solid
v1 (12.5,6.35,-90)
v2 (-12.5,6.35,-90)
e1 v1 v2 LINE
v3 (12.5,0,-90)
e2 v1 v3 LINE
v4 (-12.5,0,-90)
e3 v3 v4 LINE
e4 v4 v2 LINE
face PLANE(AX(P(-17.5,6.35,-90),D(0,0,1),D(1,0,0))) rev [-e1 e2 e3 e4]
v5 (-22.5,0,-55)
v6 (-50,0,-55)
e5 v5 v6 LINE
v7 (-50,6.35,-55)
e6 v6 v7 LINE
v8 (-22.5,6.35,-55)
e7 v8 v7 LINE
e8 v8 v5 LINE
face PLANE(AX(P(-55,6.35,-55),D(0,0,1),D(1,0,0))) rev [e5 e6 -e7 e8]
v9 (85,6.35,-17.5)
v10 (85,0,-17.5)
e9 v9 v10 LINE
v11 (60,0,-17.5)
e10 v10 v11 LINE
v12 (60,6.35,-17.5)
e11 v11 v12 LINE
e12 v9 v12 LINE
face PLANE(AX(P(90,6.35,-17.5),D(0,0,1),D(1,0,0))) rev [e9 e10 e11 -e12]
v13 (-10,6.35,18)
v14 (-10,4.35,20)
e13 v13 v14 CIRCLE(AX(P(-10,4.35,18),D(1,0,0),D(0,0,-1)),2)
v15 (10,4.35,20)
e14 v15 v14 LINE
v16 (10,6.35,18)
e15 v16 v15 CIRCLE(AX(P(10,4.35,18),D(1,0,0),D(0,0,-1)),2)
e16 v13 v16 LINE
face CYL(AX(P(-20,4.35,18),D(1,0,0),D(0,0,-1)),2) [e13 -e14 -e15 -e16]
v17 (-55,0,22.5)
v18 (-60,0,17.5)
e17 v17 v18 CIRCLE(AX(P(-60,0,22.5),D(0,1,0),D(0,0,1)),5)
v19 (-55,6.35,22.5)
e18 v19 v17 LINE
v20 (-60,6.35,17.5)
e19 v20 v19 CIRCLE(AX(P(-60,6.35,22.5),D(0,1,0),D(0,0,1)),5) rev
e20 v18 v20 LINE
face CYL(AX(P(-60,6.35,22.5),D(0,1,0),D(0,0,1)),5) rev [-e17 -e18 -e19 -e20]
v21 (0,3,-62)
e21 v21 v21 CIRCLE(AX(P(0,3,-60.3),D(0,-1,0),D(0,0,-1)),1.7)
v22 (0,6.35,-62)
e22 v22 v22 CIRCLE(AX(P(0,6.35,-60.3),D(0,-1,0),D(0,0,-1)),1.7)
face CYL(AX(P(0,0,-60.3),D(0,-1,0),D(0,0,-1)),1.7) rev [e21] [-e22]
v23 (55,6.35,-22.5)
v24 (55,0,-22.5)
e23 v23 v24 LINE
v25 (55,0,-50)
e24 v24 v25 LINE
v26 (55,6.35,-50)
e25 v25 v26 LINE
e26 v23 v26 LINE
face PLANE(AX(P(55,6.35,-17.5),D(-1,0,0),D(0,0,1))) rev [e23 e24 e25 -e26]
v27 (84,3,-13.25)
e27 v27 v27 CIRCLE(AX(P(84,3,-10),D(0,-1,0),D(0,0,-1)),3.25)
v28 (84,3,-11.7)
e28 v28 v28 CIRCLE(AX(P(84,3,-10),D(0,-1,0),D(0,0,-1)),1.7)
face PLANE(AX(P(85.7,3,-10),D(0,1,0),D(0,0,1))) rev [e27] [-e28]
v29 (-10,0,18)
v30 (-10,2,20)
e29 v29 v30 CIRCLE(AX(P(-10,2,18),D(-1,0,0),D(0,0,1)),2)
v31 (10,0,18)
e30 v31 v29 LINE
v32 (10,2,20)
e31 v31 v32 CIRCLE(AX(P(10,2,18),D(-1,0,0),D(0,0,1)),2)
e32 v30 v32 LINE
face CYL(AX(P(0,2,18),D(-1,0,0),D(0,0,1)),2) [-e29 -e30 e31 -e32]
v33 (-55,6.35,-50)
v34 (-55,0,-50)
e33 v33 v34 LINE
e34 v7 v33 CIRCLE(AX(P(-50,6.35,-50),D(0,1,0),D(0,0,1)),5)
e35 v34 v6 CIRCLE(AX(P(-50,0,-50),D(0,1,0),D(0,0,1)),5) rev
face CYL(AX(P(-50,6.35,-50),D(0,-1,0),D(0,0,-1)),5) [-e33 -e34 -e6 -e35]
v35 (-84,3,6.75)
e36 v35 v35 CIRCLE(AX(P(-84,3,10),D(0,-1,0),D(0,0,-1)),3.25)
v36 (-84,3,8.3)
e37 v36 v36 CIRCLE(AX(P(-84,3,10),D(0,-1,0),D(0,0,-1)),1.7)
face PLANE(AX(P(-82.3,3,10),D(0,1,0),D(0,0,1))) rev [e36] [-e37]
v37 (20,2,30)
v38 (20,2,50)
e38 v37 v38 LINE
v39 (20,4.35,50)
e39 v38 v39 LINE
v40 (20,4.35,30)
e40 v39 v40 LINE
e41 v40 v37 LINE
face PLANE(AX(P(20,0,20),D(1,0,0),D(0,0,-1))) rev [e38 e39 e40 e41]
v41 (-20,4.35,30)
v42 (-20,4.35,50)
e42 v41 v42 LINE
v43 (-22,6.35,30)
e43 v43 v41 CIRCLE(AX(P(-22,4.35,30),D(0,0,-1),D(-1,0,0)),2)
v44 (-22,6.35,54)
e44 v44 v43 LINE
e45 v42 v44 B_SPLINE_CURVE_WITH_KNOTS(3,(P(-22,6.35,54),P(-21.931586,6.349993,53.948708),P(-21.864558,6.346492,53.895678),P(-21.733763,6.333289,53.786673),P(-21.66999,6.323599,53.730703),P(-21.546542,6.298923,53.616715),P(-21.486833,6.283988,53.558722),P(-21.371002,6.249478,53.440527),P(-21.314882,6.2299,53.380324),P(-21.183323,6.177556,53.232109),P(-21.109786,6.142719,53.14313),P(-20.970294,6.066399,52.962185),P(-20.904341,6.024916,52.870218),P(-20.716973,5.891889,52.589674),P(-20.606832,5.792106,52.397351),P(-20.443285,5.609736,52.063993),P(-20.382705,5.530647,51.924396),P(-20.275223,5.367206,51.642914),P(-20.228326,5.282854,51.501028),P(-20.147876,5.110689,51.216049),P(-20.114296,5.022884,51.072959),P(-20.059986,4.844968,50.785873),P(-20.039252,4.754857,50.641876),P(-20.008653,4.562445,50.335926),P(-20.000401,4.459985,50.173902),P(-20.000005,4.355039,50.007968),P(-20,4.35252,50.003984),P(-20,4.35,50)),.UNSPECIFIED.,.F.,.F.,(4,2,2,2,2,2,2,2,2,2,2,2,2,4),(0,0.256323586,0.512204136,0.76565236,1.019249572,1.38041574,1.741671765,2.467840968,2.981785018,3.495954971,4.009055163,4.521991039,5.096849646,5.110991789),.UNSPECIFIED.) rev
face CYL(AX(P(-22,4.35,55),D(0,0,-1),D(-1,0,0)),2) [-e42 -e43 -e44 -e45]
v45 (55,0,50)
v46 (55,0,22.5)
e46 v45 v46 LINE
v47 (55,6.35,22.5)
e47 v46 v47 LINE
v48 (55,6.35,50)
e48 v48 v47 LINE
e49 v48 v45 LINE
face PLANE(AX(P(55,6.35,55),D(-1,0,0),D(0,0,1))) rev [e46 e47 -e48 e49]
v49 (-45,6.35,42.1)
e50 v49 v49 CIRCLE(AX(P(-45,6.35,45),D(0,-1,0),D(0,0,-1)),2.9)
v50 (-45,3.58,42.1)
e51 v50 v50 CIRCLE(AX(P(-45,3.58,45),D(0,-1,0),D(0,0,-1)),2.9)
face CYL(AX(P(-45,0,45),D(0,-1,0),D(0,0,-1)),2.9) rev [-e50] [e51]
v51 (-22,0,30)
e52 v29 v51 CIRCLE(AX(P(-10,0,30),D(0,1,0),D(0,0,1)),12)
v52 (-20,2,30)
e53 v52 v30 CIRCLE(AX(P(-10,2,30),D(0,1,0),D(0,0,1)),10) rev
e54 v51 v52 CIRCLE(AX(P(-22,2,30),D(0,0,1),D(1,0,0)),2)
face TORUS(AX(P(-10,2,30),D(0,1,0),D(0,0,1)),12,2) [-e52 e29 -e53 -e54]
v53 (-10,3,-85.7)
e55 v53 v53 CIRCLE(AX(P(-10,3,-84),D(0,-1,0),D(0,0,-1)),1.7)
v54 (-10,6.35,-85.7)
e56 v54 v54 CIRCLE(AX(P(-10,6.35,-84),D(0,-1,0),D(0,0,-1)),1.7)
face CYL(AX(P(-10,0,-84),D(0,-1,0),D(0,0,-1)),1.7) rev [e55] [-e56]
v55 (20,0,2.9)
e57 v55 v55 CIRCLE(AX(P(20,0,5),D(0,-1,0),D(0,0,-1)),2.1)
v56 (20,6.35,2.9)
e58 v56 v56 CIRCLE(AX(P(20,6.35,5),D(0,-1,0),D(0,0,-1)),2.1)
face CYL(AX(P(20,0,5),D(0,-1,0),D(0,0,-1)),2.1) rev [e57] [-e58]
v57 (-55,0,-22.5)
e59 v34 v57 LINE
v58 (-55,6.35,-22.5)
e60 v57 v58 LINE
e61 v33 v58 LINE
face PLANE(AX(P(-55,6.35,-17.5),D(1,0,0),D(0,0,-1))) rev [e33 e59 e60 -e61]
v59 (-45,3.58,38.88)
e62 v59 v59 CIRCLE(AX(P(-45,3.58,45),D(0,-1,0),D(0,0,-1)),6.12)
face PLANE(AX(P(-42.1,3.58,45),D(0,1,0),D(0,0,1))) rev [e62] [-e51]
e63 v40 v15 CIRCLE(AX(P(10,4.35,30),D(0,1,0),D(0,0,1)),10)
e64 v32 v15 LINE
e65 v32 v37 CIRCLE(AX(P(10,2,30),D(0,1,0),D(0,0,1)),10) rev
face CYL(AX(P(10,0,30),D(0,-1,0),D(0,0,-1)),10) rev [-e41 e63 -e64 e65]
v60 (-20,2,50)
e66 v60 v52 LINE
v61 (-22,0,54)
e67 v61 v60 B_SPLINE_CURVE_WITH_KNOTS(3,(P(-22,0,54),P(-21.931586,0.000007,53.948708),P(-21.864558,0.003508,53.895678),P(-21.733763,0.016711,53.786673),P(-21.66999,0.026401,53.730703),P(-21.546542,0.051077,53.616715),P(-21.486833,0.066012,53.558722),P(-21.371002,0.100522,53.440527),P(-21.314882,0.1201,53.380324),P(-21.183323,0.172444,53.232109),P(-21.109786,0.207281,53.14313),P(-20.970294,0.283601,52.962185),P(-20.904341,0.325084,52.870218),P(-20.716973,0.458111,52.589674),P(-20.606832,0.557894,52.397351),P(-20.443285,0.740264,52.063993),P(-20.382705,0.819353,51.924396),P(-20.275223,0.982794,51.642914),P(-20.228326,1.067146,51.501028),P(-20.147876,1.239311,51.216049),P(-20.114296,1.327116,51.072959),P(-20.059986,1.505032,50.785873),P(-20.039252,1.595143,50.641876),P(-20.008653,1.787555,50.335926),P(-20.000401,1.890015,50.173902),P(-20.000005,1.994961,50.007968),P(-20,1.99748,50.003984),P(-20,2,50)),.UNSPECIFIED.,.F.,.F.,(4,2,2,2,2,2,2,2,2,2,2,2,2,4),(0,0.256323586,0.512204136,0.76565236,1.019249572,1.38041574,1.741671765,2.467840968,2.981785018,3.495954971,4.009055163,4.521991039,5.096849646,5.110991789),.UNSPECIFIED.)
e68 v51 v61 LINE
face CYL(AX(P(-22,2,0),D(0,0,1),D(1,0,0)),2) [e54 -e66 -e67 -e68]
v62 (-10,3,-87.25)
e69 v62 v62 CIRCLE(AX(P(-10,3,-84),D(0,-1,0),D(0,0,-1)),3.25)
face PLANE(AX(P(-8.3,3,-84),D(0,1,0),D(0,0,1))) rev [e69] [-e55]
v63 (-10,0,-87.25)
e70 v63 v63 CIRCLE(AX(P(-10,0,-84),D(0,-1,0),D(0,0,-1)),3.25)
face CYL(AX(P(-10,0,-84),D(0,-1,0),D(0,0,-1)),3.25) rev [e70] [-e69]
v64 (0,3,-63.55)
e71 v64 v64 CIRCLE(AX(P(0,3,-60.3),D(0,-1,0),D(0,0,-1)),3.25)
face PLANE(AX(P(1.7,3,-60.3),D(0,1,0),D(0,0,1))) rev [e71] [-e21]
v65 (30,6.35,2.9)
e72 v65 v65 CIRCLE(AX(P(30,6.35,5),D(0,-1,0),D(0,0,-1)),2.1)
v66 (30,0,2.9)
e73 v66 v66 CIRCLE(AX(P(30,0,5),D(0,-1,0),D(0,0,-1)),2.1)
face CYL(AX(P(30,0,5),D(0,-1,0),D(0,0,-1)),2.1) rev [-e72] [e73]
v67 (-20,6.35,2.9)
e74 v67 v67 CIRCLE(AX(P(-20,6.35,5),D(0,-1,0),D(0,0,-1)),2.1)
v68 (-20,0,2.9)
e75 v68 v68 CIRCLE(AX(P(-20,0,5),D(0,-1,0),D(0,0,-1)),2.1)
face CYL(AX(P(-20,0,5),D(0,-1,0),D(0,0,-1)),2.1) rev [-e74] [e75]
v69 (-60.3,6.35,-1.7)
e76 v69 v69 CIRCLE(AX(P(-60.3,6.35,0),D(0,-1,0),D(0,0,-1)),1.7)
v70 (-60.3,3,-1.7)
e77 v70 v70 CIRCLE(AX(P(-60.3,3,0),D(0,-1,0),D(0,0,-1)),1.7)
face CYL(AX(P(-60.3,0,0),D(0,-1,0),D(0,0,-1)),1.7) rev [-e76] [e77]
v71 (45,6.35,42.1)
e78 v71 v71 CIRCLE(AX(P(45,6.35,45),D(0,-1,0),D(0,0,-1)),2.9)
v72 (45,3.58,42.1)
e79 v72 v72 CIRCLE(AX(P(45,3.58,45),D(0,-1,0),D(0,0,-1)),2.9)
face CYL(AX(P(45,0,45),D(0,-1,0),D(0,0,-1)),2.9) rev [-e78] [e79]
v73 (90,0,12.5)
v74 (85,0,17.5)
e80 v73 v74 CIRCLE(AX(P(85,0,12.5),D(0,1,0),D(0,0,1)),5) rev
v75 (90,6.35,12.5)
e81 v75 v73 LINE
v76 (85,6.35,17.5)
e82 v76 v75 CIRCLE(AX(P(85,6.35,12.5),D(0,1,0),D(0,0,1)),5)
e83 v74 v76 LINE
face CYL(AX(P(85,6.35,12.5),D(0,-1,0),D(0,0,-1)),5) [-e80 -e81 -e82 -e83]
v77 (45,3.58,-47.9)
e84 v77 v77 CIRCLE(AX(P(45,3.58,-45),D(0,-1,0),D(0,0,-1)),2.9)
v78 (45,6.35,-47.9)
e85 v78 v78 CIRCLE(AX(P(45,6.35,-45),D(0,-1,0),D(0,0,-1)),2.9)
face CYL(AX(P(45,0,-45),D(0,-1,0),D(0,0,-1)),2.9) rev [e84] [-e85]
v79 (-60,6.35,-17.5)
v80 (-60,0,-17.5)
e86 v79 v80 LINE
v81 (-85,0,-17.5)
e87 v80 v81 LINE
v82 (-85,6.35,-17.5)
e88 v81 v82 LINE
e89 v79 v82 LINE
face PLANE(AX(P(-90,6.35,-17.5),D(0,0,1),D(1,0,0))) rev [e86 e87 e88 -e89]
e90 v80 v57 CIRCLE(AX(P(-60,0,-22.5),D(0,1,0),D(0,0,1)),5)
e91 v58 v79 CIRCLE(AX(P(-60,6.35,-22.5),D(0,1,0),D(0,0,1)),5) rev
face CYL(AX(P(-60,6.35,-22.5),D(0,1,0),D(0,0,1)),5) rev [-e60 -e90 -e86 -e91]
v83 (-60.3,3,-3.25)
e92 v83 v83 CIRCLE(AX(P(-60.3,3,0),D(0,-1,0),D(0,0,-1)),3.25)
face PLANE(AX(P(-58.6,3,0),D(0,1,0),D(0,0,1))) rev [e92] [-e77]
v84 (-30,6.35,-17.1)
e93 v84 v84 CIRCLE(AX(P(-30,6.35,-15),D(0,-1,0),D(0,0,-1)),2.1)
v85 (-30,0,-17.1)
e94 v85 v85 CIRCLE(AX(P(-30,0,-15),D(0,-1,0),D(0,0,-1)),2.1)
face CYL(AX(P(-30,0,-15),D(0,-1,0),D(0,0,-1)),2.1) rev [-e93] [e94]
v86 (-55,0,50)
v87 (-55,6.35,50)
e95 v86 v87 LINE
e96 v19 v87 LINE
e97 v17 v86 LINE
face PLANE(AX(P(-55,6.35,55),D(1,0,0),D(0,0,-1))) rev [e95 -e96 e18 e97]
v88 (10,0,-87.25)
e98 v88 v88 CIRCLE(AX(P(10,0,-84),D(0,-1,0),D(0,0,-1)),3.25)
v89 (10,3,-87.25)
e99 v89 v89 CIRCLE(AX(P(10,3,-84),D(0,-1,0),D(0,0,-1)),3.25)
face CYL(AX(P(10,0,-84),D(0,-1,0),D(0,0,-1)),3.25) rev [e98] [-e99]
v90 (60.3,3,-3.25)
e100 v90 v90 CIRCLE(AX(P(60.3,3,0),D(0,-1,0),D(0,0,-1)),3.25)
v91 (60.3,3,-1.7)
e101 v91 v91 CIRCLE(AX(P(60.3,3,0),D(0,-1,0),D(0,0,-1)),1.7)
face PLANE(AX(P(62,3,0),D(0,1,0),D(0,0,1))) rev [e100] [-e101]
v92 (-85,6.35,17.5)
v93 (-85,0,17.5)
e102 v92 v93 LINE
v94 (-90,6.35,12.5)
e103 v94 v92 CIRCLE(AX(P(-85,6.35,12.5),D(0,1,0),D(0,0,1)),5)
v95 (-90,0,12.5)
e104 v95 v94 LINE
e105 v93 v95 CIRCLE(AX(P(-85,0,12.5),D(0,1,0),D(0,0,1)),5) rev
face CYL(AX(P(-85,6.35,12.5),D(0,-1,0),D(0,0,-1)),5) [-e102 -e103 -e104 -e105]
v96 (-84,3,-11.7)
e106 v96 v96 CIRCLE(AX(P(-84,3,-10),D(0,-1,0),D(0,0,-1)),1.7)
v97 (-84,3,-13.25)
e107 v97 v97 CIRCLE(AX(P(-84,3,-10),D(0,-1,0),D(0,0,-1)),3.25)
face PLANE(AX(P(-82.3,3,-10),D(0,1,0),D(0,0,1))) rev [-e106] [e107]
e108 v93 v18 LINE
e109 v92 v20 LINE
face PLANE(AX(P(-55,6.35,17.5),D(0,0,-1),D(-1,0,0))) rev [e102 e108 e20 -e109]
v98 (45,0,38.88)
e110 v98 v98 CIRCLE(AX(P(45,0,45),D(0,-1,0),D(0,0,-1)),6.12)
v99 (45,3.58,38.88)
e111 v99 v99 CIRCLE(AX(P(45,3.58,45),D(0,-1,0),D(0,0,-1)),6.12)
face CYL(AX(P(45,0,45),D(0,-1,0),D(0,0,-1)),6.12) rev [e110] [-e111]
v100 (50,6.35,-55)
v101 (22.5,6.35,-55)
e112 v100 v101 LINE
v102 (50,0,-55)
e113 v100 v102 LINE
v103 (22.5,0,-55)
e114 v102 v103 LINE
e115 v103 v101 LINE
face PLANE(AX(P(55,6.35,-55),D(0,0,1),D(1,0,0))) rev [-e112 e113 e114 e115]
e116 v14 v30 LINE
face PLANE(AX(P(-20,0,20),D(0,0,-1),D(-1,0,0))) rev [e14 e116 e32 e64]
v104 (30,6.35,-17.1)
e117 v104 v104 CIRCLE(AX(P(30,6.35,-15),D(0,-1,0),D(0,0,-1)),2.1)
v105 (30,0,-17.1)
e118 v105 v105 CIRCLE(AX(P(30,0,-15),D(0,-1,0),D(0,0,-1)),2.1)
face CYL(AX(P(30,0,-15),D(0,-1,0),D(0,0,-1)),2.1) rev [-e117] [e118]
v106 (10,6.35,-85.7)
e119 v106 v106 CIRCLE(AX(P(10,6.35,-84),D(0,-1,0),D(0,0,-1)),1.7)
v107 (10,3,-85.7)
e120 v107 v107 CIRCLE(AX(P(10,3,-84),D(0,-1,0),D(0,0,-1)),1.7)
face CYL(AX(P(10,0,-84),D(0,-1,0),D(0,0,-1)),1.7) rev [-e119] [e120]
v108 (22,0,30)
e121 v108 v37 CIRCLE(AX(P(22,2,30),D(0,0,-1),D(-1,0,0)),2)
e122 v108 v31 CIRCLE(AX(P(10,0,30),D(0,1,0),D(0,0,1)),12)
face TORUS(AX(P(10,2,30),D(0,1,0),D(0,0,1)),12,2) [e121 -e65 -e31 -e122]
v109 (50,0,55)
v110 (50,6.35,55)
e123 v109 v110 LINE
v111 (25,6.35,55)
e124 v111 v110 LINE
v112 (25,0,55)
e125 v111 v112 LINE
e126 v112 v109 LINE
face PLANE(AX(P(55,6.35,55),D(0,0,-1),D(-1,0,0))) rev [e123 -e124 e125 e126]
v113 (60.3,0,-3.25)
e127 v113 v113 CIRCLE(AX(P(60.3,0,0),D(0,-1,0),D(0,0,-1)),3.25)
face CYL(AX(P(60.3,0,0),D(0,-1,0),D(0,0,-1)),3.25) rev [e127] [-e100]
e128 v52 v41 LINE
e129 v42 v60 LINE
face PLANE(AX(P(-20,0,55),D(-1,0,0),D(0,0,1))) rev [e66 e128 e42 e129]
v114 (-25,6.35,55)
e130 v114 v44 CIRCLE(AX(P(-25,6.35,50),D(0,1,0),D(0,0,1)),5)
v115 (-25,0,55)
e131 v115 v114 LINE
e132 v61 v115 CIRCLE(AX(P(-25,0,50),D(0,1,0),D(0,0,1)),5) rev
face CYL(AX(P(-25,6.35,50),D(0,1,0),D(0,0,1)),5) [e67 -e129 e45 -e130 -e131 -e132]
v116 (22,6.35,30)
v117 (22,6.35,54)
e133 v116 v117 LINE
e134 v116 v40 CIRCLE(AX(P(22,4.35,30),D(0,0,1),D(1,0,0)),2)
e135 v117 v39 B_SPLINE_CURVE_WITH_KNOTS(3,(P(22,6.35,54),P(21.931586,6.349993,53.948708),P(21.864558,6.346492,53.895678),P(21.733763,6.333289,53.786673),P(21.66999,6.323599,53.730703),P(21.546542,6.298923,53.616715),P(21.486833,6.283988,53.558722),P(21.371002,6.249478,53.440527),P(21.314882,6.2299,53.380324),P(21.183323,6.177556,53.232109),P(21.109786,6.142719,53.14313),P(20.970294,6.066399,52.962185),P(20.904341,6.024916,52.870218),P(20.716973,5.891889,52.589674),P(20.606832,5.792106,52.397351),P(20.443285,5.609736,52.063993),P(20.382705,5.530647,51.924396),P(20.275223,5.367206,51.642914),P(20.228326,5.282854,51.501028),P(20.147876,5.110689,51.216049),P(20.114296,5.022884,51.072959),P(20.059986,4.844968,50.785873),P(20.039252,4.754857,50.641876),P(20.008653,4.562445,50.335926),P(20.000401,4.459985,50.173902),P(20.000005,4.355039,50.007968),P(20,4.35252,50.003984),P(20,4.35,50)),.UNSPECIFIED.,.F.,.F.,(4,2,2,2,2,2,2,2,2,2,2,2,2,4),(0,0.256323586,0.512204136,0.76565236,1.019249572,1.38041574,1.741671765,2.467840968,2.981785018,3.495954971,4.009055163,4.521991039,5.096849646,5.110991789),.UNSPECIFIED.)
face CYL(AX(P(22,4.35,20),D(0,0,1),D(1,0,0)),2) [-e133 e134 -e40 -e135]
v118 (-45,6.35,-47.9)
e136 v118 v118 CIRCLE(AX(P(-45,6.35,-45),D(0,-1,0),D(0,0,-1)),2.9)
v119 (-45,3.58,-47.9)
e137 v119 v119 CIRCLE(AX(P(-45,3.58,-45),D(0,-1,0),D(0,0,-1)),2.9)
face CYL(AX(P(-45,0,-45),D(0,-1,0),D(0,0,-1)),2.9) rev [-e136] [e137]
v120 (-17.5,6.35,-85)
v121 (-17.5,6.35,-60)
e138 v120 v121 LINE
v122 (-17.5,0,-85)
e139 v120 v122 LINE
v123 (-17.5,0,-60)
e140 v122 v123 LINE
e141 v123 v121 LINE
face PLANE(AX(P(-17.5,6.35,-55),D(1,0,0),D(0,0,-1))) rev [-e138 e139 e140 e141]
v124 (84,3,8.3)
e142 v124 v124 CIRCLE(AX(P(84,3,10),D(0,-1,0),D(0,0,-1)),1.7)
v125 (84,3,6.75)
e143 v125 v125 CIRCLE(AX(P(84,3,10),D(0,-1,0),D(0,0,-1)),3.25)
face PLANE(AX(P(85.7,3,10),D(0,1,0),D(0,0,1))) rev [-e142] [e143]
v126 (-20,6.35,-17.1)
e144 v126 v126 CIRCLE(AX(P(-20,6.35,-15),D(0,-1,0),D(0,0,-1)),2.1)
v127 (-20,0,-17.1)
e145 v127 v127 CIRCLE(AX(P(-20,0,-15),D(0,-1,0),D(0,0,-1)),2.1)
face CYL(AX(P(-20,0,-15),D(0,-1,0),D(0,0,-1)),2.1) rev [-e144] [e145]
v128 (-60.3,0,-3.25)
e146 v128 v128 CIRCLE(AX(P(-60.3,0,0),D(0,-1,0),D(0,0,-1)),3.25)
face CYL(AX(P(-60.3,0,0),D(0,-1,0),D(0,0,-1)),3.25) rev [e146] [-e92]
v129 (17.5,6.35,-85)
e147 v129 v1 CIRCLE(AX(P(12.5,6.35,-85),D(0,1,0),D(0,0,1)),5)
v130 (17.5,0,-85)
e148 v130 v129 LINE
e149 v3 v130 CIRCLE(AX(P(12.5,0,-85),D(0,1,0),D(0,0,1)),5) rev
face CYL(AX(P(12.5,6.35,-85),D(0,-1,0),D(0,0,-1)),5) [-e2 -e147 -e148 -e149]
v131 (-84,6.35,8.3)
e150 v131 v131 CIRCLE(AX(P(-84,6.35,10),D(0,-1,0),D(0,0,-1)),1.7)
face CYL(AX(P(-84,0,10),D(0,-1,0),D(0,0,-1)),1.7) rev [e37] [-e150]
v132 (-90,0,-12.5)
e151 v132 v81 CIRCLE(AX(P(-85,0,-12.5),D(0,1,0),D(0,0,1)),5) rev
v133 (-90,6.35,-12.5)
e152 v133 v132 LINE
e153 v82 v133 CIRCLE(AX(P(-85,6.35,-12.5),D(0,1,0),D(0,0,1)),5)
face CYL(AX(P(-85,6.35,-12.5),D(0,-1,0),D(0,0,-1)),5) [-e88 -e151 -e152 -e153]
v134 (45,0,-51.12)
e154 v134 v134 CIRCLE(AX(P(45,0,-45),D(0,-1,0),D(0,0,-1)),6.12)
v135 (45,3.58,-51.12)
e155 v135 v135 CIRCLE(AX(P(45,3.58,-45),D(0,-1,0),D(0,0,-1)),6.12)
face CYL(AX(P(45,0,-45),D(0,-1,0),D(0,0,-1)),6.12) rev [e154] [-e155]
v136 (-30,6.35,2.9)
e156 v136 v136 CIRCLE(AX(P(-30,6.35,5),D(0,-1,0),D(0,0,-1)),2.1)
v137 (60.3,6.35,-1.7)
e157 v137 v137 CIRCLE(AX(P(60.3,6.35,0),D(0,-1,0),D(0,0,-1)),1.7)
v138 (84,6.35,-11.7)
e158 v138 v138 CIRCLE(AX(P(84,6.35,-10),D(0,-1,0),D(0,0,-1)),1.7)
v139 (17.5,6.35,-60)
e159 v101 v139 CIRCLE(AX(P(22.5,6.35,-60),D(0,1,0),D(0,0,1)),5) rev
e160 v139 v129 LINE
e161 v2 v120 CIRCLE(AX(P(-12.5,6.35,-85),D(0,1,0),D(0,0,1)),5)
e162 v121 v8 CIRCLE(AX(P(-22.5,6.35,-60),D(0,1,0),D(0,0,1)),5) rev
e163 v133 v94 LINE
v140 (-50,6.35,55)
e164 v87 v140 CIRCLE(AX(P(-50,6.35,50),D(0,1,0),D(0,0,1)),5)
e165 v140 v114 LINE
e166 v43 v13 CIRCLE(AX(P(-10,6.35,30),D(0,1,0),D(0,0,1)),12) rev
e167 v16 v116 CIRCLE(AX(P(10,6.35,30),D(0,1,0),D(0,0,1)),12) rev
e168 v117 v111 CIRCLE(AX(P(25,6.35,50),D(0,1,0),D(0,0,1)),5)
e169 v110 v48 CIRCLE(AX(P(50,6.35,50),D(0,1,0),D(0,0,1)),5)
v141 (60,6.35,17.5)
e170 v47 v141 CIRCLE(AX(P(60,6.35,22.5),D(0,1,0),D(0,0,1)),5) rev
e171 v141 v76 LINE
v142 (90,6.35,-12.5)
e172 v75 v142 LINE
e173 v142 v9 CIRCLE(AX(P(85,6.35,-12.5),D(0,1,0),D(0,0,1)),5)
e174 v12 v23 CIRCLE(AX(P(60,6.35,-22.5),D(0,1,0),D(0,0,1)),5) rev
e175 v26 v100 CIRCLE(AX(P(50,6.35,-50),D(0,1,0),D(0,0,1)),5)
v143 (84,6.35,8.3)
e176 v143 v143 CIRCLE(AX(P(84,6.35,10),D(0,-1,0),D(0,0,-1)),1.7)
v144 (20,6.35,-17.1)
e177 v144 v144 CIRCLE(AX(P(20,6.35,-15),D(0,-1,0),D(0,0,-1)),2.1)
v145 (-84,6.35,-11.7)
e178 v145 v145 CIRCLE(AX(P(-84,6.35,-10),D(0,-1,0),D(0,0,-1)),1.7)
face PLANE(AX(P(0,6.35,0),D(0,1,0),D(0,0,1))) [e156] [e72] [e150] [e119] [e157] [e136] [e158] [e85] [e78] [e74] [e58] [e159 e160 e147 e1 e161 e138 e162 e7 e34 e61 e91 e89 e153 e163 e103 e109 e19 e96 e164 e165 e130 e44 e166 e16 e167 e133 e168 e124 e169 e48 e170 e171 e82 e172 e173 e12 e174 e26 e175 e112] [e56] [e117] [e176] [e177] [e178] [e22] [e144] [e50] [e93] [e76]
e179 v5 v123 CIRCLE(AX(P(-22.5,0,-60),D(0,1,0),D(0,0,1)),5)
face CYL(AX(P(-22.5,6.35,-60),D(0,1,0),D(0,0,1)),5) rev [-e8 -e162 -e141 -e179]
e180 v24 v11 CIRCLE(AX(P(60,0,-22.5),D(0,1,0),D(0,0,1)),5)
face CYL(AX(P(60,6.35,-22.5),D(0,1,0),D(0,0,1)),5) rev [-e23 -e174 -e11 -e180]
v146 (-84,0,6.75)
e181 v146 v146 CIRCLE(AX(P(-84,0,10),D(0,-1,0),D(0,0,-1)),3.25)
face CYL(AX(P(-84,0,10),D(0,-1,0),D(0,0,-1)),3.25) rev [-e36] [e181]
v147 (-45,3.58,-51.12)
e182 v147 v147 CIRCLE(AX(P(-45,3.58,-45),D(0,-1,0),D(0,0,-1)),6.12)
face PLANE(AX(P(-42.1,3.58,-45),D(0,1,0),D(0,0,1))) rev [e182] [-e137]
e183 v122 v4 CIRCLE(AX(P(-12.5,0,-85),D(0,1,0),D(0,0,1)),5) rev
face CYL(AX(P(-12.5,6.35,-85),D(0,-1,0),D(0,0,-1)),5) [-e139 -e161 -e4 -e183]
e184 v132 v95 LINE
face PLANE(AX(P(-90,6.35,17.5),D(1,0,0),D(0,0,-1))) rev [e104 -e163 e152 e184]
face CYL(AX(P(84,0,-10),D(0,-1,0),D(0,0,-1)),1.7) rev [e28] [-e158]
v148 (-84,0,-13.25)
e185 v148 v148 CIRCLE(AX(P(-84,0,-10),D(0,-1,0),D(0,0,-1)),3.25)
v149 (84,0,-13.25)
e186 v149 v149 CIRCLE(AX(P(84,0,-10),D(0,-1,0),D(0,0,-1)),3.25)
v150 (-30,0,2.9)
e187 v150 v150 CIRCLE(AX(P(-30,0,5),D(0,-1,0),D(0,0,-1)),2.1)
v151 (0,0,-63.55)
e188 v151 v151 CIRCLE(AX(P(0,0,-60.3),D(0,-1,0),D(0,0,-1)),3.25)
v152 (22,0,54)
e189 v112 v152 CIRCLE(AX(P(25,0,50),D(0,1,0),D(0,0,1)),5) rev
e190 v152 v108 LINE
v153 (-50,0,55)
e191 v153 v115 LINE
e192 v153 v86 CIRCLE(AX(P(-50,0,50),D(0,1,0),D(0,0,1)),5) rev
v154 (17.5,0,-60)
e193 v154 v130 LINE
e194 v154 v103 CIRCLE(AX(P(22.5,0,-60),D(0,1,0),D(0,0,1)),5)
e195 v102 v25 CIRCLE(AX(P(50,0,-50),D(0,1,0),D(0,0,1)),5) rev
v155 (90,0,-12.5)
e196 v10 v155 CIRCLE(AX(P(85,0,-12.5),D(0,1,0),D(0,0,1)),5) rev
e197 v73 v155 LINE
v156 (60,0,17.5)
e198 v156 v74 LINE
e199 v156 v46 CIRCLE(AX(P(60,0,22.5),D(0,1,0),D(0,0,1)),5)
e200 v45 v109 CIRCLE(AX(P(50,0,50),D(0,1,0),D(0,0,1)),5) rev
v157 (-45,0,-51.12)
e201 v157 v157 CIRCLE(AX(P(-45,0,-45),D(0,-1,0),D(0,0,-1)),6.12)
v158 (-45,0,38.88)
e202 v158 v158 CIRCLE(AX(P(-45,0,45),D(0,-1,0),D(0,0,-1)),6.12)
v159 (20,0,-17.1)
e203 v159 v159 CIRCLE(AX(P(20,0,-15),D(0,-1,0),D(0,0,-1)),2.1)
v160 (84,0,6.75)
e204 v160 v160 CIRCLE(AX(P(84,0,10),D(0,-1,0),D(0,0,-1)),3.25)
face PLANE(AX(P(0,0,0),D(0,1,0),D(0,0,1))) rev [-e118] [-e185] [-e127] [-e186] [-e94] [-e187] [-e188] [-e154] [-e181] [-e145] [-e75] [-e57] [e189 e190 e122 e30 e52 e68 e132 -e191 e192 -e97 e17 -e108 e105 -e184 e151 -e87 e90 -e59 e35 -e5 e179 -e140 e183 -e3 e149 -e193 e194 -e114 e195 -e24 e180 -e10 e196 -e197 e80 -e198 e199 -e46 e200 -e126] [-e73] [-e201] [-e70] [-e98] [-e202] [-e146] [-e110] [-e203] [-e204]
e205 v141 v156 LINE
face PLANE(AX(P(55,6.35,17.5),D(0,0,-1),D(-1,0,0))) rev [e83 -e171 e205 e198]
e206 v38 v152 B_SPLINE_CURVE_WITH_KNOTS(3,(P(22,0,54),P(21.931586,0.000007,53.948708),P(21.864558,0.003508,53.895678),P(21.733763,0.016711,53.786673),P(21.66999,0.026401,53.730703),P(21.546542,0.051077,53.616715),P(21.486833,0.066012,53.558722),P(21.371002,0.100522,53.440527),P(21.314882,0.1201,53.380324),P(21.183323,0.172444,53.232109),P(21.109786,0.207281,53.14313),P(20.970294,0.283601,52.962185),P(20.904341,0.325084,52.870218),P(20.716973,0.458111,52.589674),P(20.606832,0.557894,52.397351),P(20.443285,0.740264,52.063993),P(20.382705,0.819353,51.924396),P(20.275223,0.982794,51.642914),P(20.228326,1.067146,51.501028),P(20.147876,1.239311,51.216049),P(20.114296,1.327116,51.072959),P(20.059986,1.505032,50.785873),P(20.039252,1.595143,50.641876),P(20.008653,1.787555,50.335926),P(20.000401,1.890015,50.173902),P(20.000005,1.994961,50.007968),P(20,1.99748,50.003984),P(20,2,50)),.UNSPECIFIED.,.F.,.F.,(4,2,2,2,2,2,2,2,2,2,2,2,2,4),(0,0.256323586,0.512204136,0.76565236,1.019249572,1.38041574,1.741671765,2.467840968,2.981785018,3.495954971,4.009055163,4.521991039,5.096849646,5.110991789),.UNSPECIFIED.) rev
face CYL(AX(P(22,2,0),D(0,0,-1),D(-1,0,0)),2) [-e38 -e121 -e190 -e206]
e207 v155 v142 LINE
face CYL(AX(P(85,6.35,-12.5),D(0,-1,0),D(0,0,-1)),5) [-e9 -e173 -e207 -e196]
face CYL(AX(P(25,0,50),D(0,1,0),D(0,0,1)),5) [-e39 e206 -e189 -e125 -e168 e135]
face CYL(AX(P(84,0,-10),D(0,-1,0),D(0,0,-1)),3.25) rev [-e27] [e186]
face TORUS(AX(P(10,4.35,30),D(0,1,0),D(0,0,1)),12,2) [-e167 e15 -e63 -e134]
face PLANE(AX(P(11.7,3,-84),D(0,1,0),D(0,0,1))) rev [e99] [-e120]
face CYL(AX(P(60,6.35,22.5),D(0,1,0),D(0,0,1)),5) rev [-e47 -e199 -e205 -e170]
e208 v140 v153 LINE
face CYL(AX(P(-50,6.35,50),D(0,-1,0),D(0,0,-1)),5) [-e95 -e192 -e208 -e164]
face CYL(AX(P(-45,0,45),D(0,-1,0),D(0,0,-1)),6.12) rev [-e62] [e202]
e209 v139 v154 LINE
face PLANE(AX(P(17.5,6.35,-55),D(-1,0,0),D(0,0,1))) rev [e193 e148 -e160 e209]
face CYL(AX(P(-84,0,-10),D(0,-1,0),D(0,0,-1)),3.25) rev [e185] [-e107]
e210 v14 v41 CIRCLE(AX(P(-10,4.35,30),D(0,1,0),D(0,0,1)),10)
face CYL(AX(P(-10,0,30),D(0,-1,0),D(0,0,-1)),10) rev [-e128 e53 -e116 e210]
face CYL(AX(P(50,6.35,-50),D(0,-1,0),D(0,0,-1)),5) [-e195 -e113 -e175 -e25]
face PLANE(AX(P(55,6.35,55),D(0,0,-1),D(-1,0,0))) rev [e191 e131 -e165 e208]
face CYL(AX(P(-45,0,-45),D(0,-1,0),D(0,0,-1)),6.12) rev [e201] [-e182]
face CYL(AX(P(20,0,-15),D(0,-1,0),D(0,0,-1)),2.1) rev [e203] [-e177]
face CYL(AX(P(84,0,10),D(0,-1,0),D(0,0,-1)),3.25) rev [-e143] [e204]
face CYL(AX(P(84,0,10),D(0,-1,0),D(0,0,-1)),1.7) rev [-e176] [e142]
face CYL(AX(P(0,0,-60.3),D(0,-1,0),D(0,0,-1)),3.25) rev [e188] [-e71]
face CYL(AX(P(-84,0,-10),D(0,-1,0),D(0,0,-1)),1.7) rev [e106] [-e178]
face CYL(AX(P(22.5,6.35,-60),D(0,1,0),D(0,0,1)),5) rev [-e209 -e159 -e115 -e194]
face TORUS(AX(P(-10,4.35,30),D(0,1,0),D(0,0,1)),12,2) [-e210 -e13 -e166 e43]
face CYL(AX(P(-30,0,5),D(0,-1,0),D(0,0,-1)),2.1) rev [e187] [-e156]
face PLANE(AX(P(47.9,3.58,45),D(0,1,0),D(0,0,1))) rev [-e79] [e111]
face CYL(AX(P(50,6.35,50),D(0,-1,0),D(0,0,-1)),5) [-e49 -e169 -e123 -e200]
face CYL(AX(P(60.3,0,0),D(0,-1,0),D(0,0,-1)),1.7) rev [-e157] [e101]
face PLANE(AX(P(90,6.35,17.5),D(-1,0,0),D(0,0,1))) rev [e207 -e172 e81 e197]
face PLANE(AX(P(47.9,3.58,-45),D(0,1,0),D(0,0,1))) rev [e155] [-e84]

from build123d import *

# Parameters (mm, degrees)
BOSS_EXTRUDE1_DEPTH                     = 6.35
M5X0_8_TAPPED_HOLE1_D                   = 4.2
SKETCH4_W                               = 40
SKETCH4_H                               = 35
CUT_EXTRUDE1_DEPTH                      = 128.437523909
FILLET1_R                               = 5
CBORE_FOR_M5_HEX_HEAD_BOLT1_D           = 5.8
CBORE_FOR_M5_HEX_HEAD_BOLT1_CBORE_D     = 12.24
CBORE_FOR_M5_HEX_HEAD_BOLT1_CBORE_DEPTH = 3.58
FILLET2_R                               = 10
FILLET3_R                               = 2
CBORE_FOR_M3_SHCS1_D                    = 3.4
CBORE_FOR_M3_SHCS1_CBORE_D              = 6.5
CBORE_FOR_M3_SHCS1_CBORE_DEPTH          = 3


with BuildPart() as part:
    # Base plate → Boss-Extrude1 (new body)
    with BuildSketch(Plane(origin=(0, 0, 0), x_dir=(1, 0, 0), z_dir=(0, 1, 0))):
        Polygon((55, -55), (-55, -55), (-55, -17.5), (-90, -17.5), (-90, 17.5), (-55, 17.5), (-55, 55), (-17.5, 55), (-17.5, 90), (17.5, 90), (17.5, 55), (55, 55), (55, 17.5), (90, 17.5), (90, -17.5), (55, -17.5), align=None)
    extrude(amount=BOSS_EXTRUDE1_DEPTH)

    # M5x0.8 Tapped Hole1 (through all)
    with Locations(Plane(origin=(0, 0, 0), x_dir=(-1, 0, 0), z_dir=(0, -1, 0))):
        with Locations((-20, 15), (20, 15), (20, -5), (-20, -5), (-30, 15), (-30, -5), (30, 15), (30, -5)):
            Hole(M5X0_8_TAPPED_HOLE1_D / 2)

    # Sketch4 → Cut-Extrude1 (cut, through all)
    with BuildSketch(Plane(origin=(0, 6.35, 0), x_dir=(1, 0, 0), z_dir=(0, 1, 0))):
        with Locations((0, -37.5)):
            Rectangle(SKETCH4_W, SKETCH4_H)
    extrude(amount=-CUT_EXTRUDE1_DEPTH, mode=Mode.SUBTRACT)

    # Fillet1
    fillet1_edges = [part.edges().sort_by_distance(p)[0] for p in [
        (17.5, 3.175, -90),
        (17.5, 3.175, -55),
        (55, 3.175, -55),
        (55, 3.175, -17.5),
        (90, 3.175, -17.5),
        (90, 3.175, 17.5),
        (55, 3.175, 17.5),
        (55, 3.175, 55),
        (-55, 3.175, 55),
        (-55, 3.175, 17.5),
        (-90, 3.175, 17.5),
        (-90, 3.175, -17.5),
        (-55, 3.175, -17.5),
        (-55, 3.175, -55),
        (-17.5, 3.175, -55),
        (-17.5, 3.175, -90),
        (20, 3.175, 55),
        (-20, 3.175, 55),
    ]]
    fillet(fillet1_edges, radius=FILLET1_R)

    # CBORE for M5 Hex Head Bolt1 (through all)
    with Locations(Plane.XZ):
        with Locations((-45, 45), (-45, -45), (45, -45), (45, 45)):
            CounterBoreHole(CBORE_FOR_M5_HEX_HEAD_BOLT1_D / 2, CBORE_FOR_M5_HEX_HEAD_BOLT1_CBORE_D / 2, CBORE_FOR_M5_HEX_HEAD_BOLT1_CBORE_DEPTH)

    # Fillet2
    fillet2_edges = [part.edges().sort_by_distance(p)[0] for p in [
        (-20, 3.175, 20),
        (20, 3.175, 20),
    ]]
    fillet(fillet2_edges, radius=FILLET2_R)

    # Fillet3
    # the kernel refuses this fillet: 2 mm, written as the material it takes off along each edge
    with BuildSketch(Plane(origin=(20, 6.35, 30), x_dir=(0, -1, 0), z_dir=(0, 0, 1)), Plane(origin=(-20, 6.35, 55), x_dir=(0, -1, 0), z_dir=(0, 0, -1))) as fillet3_piece_1:
        with BuildLine():
            CenterArc((FILLET3_R, FILLET3_R), FILLET3_R, 180, 90)
            Line((0, FILLET3_R), (0, 0))
            Line((0, 0), (FILLET3_R, 0))
        make_face()
    extrude(amount=25, mode=Mode.SUBTRACT)
    with BuildSketch(Plane(origin=(-10, 6.35, 20), x_dir=(0, -1, 0), z_dir=(1, 0, 0))) as fillet3_piece_2:
        with BuildLine():
            CenterArc((FILLET3_R, FILLET3_R), FILLET3_R, 180, 90)
            Line((0, FILLET3_R), (0, 0))
            Line((0, 0), (FILLET3_R, 0))
        make_face()
    extrude(amount=20, mode=Mode.SUBTRACT)
    with BuildSketch(Plane(origin=(-20, 0, 30), x_dir=(-1, 0, 0), z_dir=(0, 0, 1)), Plane(origin=(20, 0, 55), x_dir=(1, 0, 0), z_dir=(0, 0, -1))) as fillet3_piece_3:
        with BuildLine():
            CenterArc((FILLET3_R, -FILLET3_R), FILLET3_R, 90, 90)
            Line((0, -FILLET3_R), (0, 0))
            Line((0, 0), (FILLET3_R, 0))
        make_face()
    extrude(amount=25, mode=Mode.SUBTRACT)
    with BuildSketch(Plane(origin=(10, 0, 20), x_dir=(0, 0, -1), z_dir=(-1, 0, 0))) as fillet3_piece_4:
        with BuildLine():
            CenterArc((FILLET3_R, -FILLET3_R), FILLET3_R, 90, 90)
            Line((0, -FILLET3_R), (0, 0))
            Line((0, 0), (FILLET3_R, 0))
        make_face()
    extrude(amount=20, mode=Mode.SUBTRACT)
    with BuildSketch(Plane(origin=(10, 0, 30), x_dir=(1, 0, 0), z_dir=(0, 0, 1))) as fillet3_piece_5:
        with BuildLine():
            CenterArc((10 + FILLET3_R, FILLET3_R), FILLET3_R, 180, 90)
            Line((10, FILLET3_R), (10, 0))
            Line((10, 0), (10 + FILLET3_R, 0))
        make_face()
    revolve(axis=Axis((10, 0, 30), (0, 1, 0)), revolution_arc=90, mode=Mode.SUBTRACT)
    with BuildSketch(Plane(origin=(-10, 0, 30), x_dir=(0, 0, -1), z_dir=(1, 0, 0))) as fillet3_piece_6:
        with BuildLine():
            CenterArc((10 + FILLET3_R, FILLET3_R), FILLET3_R, 180, 90)
            Line((10, FILLET3_R), (10, 0))
            Line((10, 0), (10 + FILLET3_R, 0))
        make_face()
    revolve(axis=Axis((-10, 0, 30), (0, 1, 0)), revolution_arc=90, mode=Mode.SUBTRACT)
    with BuildSketch(Plane(origin=(-10, 6.35, 30), x_dir=(0, 0, -1), z_dir=(1, 0, 0))) as fillet3_piece_7:
        with BuildLine():
            CenterArc((10 + FILLET3_R, -FILLET3_R), FILLET3_R, 90, 90)
            Line((10 + FILLET3_R, 0), (10, 0))
            Line((10, 0), (10, -FILLET3_R))
        make_face()
    revolve(axis=Axis((-10, 6.35, 30), (0, 1, 0)), revolution_arc=90, mode=Mode.SUBTRACT)
    with BuildSketch(Plane(origin=(10, 6.35, 30), x_dir=(1, 0, 0), z_dir=(0, 0, 1))) as fillet3_piece_8:
        with BuildLine():
            CenterArc((10 + FILLET3_R, -FILLET3_R), FILLET3_R, 90, 90)
            Line((10 + FILLET3_R, 0), (10, 0))
            Line((10, 0), (10, -FILLET3_R))
        make_face()
    revolve(axis=Axis((10, 6.35, 30), (0, 1, 0)), revolution_arc=90, mode=Mode.SUBTRACT)

    # CBORE for M3 SHCS1 (through all)
    with Locations(Plane(origin=(0, 0, 0), x_dir=(-1, 0, 0), z_dir=(0, -1, 0))):
        with Locations((10, 84), (-10, 84), (0, 60.3), (-84, 10), (-84, -10), (-60.3, 0), (84, -10), (84, 10), (60.3, 0)):
            CounterBoreHole(CBORE_FOR_M3_SHCS1_D / 2, CBORE_FOR_M3_SHCS1_CBORE_D / 2, CBORE_FOR_M3_SHCS1_CBORE_DEPTH)


solid = part.part
